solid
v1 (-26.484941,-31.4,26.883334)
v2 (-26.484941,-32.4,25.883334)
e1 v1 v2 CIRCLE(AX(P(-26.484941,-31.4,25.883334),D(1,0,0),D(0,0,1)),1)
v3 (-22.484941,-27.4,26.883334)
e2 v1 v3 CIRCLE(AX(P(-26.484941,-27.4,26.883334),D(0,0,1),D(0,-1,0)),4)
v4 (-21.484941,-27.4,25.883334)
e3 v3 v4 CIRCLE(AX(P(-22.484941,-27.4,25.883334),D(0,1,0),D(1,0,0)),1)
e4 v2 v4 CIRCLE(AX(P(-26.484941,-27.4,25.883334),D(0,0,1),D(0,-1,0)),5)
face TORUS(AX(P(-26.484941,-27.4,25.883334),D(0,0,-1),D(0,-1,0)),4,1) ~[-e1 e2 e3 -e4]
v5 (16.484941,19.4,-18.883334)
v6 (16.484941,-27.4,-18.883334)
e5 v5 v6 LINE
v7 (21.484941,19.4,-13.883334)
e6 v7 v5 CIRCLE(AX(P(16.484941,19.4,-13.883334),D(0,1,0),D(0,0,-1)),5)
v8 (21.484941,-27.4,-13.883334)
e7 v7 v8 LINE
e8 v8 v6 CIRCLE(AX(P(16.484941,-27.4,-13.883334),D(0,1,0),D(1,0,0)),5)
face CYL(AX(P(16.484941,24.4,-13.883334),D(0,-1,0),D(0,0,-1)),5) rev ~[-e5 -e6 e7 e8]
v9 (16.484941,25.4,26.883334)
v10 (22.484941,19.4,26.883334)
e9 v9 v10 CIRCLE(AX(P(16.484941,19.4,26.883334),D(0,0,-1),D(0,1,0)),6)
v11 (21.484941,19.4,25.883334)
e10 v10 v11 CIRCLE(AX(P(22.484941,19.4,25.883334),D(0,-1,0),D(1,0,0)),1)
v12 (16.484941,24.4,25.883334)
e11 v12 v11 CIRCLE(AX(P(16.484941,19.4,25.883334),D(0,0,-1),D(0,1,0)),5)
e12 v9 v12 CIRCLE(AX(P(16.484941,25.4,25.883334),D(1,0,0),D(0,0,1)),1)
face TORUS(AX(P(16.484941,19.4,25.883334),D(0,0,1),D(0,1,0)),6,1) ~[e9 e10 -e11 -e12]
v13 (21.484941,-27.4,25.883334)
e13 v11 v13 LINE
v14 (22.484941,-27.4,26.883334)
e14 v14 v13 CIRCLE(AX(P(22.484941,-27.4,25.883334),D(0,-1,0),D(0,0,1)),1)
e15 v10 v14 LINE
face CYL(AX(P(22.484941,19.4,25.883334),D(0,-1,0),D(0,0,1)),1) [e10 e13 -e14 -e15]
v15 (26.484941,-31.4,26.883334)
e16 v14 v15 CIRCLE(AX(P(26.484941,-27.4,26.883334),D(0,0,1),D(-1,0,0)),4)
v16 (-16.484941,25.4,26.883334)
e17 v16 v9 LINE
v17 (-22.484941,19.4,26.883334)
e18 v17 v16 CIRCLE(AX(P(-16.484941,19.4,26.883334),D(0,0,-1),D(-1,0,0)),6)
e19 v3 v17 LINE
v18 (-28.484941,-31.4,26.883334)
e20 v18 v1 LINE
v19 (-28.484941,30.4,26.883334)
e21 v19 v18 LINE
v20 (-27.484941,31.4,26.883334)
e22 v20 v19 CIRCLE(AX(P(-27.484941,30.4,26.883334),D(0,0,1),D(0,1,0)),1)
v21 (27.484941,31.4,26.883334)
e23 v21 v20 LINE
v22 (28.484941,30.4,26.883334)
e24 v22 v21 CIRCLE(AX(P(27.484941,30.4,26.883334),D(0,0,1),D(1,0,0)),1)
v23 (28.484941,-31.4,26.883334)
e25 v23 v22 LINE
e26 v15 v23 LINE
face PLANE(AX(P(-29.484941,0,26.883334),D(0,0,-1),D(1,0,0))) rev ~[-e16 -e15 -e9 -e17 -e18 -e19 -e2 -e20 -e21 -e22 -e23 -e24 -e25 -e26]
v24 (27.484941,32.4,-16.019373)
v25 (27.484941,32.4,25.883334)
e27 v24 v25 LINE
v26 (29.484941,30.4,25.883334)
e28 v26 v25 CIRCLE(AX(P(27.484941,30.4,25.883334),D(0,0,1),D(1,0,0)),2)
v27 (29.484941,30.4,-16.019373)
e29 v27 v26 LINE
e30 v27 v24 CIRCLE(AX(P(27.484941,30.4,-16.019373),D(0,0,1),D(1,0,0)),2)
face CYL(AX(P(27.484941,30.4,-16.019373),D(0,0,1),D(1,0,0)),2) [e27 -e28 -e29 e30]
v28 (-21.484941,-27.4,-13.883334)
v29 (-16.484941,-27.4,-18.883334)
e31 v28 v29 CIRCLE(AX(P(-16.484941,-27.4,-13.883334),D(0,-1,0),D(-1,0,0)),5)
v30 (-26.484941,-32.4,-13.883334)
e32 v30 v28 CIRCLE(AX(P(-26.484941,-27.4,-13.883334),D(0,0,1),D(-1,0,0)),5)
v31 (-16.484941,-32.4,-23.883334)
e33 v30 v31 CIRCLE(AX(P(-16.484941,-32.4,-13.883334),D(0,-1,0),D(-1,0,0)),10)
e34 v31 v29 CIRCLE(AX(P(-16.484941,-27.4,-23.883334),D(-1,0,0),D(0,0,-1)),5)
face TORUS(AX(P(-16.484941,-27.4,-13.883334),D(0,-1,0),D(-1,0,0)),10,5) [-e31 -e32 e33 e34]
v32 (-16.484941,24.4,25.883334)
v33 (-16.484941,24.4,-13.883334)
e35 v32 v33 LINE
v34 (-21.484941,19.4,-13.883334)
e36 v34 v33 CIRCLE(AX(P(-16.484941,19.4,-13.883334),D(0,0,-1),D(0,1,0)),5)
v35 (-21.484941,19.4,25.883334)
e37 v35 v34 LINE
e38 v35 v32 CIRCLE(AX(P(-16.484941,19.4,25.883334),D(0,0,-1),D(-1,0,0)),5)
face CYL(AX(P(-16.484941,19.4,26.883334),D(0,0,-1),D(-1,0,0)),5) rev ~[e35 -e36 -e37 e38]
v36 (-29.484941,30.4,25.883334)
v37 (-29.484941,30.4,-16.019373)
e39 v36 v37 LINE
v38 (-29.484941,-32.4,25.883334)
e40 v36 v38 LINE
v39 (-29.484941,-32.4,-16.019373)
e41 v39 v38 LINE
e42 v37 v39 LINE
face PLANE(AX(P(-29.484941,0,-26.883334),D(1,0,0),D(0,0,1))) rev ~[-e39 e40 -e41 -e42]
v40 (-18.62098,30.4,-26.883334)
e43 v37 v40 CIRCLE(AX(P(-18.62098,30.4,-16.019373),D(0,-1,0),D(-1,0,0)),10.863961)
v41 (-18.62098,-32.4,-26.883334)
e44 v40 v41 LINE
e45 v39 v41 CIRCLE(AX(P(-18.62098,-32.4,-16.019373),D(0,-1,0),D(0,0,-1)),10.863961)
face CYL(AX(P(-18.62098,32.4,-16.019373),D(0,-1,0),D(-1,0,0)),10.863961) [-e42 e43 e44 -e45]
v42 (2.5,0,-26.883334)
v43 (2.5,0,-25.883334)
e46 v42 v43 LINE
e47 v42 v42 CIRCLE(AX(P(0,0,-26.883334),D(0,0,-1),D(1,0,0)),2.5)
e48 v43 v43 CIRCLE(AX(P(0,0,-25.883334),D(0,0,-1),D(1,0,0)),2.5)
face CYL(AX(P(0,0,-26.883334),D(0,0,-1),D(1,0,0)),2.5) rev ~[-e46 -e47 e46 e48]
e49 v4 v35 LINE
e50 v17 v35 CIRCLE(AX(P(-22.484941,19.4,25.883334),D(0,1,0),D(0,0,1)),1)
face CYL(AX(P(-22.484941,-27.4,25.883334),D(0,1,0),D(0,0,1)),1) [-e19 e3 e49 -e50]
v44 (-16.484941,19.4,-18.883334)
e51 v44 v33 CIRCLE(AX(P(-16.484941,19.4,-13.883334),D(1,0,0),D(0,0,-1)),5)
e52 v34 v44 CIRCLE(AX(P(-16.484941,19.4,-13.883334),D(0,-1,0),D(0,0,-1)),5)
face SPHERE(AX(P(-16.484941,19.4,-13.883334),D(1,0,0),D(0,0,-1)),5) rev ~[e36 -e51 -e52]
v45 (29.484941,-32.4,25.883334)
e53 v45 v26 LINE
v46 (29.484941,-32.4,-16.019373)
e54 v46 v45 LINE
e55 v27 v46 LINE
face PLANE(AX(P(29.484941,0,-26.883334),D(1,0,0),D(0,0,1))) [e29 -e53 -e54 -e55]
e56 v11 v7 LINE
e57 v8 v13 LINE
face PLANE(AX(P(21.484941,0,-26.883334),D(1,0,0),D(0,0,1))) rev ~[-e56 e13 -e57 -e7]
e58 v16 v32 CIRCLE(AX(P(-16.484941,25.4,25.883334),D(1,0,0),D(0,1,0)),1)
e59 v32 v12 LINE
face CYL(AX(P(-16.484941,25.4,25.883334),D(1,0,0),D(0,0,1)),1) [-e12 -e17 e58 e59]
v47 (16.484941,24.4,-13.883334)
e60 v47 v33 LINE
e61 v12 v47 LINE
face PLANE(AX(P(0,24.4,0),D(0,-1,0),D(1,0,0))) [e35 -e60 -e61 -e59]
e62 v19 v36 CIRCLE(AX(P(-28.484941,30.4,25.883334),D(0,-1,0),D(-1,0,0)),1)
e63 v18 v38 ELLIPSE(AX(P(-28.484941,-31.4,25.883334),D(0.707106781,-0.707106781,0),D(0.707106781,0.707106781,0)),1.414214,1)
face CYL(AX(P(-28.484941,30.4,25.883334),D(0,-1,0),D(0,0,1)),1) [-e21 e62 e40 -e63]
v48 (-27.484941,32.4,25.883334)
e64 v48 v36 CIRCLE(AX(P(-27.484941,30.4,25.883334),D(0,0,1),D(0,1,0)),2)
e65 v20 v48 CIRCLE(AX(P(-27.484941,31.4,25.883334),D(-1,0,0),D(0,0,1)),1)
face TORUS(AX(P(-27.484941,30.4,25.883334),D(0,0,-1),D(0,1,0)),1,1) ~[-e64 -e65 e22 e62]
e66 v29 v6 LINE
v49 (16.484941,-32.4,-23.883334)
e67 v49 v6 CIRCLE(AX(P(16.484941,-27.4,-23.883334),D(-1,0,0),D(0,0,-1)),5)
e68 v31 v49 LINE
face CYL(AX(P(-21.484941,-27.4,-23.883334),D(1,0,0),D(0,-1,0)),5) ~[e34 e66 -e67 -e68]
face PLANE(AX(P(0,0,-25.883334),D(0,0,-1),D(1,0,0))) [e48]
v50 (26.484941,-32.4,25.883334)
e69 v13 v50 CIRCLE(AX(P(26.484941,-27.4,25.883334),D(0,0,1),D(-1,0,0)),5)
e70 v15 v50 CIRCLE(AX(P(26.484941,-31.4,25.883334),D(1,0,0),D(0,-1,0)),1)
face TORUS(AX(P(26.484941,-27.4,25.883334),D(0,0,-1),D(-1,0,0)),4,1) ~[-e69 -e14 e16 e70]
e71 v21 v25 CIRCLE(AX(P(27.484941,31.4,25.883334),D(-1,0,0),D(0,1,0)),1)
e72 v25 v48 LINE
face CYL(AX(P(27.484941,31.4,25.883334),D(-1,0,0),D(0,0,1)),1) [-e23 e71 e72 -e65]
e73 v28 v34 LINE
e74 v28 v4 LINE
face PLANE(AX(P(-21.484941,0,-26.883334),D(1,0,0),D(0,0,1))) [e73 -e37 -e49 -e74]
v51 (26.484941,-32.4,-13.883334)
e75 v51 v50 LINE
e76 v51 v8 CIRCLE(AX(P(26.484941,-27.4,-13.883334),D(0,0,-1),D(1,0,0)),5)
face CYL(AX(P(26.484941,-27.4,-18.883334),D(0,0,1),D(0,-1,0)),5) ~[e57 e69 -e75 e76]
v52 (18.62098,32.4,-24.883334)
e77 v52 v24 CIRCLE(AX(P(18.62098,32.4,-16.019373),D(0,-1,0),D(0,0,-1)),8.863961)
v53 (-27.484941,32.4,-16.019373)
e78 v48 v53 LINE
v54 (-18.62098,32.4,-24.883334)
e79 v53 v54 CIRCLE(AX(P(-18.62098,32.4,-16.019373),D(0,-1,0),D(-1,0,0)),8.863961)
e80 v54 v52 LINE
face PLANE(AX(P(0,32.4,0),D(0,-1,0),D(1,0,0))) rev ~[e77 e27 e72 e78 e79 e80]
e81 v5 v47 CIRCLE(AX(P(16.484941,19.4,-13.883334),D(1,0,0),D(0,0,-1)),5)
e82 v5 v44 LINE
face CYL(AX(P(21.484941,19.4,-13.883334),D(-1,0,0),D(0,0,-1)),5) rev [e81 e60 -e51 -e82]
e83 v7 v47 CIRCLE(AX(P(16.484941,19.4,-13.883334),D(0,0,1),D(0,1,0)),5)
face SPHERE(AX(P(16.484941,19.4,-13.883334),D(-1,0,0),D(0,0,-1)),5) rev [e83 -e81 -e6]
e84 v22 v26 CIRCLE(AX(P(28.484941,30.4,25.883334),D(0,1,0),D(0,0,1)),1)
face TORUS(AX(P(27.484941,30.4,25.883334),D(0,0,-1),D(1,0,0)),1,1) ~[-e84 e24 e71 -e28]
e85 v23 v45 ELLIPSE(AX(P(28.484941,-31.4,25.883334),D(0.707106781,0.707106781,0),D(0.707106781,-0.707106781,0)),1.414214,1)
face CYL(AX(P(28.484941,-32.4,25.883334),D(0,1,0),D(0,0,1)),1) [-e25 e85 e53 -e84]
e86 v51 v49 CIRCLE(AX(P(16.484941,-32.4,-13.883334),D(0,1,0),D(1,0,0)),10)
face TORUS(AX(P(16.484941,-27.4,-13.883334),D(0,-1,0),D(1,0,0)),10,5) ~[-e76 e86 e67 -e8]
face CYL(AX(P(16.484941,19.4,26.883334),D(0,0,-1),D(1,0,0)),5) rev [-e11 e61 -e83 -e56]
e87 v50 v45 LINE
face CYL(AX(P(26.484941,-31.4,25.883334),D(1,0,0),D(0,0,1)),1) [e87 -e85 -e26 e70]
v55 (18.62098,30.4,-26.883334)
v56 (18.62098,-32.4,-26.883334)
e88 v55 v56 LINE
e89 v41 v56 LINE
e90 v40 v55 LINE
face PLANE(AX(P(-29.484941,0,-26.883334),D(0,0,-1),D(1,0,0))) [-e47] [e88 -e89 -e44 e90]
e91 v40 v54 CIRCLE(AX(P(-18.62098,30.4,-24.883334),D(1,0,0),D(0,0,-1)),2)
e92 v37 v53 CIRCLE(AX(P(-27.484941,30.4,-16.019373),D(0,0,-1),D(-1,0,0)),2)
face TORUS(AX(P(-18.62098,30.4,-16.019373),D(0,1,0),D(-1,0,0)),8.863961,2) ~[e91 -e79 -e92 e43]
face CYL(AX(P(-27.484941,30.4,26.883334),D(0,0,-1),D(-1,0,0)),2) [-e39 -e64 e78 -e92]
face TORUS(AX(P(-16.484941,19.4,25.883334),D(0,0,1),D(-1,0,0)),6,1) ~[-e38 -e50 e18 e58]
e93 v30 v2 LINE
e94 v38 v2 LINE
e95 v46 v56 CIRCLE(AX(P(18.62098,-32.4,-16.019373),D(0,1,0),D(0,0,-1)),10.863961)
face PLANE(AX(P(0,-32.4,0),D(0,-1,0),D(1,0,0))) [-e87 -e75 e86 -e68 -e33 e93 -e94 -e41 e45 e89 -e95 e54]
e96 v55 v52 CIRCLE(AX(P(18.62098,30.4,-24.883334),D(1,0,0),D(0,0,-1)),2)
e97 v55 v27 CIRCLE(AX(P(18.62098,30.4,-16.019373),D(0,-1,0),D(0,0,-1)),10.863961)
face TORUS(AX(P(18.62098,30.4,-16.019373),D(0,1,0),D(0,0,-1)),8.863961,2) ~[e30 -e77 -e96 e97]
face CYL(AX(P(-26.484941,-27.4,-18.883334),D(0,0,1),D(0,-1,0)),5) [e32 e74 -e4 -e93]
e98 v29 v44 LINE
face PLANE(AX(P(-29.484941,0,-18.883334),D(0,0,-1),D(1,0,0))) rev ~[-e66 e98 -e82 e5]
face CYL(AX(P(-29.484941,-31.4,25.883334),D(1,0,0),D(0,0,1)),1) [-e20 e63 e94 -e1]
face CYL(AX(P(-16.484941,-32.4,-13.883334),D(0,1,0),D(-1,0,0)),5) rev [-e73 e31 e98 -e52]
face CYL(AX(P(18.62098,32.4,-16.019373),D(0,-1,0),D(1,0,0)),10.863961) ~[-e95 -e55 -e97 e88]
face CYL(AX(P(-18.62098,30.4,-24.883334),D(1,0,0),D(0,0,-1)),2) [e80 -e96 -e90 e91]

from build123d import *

# Parameters (mm, degrees)
F0_W     = 58.9698813856
F0_H     = 53.7666678429
F1_DEPTH = 32.4
F2_T     = -8
F3_R     = 5
F4_R     = 10.8639610307
F5_R     = 2
F6_R     = 1
F7_R     = 2.5
F8_DEPTH = 1


with BuildPart() as f1:
    # F0 (on Front) → F1 (new body, symmetric)
    with BuildSketch(Plane.XZ):
        Rectangle(F0_W, F0_H)
    extrude(amount=F1_DEPTH, both=True)

    # F2
    f2_openings = [f1.faces().sort_by_distance(p)[0] for p in [
        (0, 0, 26.883334),
        (0, -32.4, 0),
    ]]
    offset(amount=F2_T, openings=f2_openings)

    # F3
    f3_edges = [f1.edges().sort_by_distance(p)[0] for p in [
        (0, 24.4, -18.883334),
        (0, -32.4, -18.883334),
        (-21.484941, -4, -18.883334),
        (21.484941, -4, -18.883334),
        (-21.484941, 24.4, 4),
        (21.484941, 24.4, 4),
        (21.484941, -32.4, 4),
        (-21.484941, -32.4, 4),
    ]]
    fillet(f3_edges, radius=F3_R)

    # F4
    f4_edges = [f1.edges().sort_by_distance(p)[0] for p in [
        (29.484941, 0, -26.883334),
        (-29.484941, 0, -26.883334),
    ]]
    fillet(f4_edges, radius=F4_R)

    # F5
    f5_edges = [f1.edges().sort_by_distance(p)[0] for p in [
        (0, 32.4, -26.883334),
        (29.484941, 32.4, 5.431981),
        (26.30296, 32.4, -23.701353),
        (-26.30296, 32.4, -23.701353),
        (-29.484941, 32.4, 5.431981),
    ]]
    fillet(f5_edges, radius=F5_R)

    # F6
    f6_edges = [f1.edges().sort_by_distance(p)[0] for p in [
        (0, 24.4, 26.883334),
        (29.484941, -1, 26.883334),
        (28.899154, 31.814214, 26.883334),
        (27.984941, -32.4, 26.883334),
        (-27.984941, -32.4, 26.883334),
        (0, 32.4, 26.883334),
        (22.949407, -30.935534, 26.883334),
        (-28.899154, 31.814214, 26.883334),
        (21.484941, -4, 26.883334),
        (-29.484941, -1, 26.883334),
        (20.020475, 22.935534, 26.883334),
        (-22.949407, -30.935534, 26.883334),
        (-20.020475, 22.935534, 26.883334),
        (-21.484941, -4, 26.883334),
    ]]
    fillet(f6_edges, radius=F6_R)

    # F7 (on face) → F8 (cut)
    with BuildSketch(Plane(origin=(0, 0, -26.8833339214), x_dir=(1, 0, 0), z_dir=(0, 0, -1))):
        Circle(F7_R)
    extrude(amount=-F8_DEPTH, mode=Mode.SUBTRACT)


solid = f1.part
